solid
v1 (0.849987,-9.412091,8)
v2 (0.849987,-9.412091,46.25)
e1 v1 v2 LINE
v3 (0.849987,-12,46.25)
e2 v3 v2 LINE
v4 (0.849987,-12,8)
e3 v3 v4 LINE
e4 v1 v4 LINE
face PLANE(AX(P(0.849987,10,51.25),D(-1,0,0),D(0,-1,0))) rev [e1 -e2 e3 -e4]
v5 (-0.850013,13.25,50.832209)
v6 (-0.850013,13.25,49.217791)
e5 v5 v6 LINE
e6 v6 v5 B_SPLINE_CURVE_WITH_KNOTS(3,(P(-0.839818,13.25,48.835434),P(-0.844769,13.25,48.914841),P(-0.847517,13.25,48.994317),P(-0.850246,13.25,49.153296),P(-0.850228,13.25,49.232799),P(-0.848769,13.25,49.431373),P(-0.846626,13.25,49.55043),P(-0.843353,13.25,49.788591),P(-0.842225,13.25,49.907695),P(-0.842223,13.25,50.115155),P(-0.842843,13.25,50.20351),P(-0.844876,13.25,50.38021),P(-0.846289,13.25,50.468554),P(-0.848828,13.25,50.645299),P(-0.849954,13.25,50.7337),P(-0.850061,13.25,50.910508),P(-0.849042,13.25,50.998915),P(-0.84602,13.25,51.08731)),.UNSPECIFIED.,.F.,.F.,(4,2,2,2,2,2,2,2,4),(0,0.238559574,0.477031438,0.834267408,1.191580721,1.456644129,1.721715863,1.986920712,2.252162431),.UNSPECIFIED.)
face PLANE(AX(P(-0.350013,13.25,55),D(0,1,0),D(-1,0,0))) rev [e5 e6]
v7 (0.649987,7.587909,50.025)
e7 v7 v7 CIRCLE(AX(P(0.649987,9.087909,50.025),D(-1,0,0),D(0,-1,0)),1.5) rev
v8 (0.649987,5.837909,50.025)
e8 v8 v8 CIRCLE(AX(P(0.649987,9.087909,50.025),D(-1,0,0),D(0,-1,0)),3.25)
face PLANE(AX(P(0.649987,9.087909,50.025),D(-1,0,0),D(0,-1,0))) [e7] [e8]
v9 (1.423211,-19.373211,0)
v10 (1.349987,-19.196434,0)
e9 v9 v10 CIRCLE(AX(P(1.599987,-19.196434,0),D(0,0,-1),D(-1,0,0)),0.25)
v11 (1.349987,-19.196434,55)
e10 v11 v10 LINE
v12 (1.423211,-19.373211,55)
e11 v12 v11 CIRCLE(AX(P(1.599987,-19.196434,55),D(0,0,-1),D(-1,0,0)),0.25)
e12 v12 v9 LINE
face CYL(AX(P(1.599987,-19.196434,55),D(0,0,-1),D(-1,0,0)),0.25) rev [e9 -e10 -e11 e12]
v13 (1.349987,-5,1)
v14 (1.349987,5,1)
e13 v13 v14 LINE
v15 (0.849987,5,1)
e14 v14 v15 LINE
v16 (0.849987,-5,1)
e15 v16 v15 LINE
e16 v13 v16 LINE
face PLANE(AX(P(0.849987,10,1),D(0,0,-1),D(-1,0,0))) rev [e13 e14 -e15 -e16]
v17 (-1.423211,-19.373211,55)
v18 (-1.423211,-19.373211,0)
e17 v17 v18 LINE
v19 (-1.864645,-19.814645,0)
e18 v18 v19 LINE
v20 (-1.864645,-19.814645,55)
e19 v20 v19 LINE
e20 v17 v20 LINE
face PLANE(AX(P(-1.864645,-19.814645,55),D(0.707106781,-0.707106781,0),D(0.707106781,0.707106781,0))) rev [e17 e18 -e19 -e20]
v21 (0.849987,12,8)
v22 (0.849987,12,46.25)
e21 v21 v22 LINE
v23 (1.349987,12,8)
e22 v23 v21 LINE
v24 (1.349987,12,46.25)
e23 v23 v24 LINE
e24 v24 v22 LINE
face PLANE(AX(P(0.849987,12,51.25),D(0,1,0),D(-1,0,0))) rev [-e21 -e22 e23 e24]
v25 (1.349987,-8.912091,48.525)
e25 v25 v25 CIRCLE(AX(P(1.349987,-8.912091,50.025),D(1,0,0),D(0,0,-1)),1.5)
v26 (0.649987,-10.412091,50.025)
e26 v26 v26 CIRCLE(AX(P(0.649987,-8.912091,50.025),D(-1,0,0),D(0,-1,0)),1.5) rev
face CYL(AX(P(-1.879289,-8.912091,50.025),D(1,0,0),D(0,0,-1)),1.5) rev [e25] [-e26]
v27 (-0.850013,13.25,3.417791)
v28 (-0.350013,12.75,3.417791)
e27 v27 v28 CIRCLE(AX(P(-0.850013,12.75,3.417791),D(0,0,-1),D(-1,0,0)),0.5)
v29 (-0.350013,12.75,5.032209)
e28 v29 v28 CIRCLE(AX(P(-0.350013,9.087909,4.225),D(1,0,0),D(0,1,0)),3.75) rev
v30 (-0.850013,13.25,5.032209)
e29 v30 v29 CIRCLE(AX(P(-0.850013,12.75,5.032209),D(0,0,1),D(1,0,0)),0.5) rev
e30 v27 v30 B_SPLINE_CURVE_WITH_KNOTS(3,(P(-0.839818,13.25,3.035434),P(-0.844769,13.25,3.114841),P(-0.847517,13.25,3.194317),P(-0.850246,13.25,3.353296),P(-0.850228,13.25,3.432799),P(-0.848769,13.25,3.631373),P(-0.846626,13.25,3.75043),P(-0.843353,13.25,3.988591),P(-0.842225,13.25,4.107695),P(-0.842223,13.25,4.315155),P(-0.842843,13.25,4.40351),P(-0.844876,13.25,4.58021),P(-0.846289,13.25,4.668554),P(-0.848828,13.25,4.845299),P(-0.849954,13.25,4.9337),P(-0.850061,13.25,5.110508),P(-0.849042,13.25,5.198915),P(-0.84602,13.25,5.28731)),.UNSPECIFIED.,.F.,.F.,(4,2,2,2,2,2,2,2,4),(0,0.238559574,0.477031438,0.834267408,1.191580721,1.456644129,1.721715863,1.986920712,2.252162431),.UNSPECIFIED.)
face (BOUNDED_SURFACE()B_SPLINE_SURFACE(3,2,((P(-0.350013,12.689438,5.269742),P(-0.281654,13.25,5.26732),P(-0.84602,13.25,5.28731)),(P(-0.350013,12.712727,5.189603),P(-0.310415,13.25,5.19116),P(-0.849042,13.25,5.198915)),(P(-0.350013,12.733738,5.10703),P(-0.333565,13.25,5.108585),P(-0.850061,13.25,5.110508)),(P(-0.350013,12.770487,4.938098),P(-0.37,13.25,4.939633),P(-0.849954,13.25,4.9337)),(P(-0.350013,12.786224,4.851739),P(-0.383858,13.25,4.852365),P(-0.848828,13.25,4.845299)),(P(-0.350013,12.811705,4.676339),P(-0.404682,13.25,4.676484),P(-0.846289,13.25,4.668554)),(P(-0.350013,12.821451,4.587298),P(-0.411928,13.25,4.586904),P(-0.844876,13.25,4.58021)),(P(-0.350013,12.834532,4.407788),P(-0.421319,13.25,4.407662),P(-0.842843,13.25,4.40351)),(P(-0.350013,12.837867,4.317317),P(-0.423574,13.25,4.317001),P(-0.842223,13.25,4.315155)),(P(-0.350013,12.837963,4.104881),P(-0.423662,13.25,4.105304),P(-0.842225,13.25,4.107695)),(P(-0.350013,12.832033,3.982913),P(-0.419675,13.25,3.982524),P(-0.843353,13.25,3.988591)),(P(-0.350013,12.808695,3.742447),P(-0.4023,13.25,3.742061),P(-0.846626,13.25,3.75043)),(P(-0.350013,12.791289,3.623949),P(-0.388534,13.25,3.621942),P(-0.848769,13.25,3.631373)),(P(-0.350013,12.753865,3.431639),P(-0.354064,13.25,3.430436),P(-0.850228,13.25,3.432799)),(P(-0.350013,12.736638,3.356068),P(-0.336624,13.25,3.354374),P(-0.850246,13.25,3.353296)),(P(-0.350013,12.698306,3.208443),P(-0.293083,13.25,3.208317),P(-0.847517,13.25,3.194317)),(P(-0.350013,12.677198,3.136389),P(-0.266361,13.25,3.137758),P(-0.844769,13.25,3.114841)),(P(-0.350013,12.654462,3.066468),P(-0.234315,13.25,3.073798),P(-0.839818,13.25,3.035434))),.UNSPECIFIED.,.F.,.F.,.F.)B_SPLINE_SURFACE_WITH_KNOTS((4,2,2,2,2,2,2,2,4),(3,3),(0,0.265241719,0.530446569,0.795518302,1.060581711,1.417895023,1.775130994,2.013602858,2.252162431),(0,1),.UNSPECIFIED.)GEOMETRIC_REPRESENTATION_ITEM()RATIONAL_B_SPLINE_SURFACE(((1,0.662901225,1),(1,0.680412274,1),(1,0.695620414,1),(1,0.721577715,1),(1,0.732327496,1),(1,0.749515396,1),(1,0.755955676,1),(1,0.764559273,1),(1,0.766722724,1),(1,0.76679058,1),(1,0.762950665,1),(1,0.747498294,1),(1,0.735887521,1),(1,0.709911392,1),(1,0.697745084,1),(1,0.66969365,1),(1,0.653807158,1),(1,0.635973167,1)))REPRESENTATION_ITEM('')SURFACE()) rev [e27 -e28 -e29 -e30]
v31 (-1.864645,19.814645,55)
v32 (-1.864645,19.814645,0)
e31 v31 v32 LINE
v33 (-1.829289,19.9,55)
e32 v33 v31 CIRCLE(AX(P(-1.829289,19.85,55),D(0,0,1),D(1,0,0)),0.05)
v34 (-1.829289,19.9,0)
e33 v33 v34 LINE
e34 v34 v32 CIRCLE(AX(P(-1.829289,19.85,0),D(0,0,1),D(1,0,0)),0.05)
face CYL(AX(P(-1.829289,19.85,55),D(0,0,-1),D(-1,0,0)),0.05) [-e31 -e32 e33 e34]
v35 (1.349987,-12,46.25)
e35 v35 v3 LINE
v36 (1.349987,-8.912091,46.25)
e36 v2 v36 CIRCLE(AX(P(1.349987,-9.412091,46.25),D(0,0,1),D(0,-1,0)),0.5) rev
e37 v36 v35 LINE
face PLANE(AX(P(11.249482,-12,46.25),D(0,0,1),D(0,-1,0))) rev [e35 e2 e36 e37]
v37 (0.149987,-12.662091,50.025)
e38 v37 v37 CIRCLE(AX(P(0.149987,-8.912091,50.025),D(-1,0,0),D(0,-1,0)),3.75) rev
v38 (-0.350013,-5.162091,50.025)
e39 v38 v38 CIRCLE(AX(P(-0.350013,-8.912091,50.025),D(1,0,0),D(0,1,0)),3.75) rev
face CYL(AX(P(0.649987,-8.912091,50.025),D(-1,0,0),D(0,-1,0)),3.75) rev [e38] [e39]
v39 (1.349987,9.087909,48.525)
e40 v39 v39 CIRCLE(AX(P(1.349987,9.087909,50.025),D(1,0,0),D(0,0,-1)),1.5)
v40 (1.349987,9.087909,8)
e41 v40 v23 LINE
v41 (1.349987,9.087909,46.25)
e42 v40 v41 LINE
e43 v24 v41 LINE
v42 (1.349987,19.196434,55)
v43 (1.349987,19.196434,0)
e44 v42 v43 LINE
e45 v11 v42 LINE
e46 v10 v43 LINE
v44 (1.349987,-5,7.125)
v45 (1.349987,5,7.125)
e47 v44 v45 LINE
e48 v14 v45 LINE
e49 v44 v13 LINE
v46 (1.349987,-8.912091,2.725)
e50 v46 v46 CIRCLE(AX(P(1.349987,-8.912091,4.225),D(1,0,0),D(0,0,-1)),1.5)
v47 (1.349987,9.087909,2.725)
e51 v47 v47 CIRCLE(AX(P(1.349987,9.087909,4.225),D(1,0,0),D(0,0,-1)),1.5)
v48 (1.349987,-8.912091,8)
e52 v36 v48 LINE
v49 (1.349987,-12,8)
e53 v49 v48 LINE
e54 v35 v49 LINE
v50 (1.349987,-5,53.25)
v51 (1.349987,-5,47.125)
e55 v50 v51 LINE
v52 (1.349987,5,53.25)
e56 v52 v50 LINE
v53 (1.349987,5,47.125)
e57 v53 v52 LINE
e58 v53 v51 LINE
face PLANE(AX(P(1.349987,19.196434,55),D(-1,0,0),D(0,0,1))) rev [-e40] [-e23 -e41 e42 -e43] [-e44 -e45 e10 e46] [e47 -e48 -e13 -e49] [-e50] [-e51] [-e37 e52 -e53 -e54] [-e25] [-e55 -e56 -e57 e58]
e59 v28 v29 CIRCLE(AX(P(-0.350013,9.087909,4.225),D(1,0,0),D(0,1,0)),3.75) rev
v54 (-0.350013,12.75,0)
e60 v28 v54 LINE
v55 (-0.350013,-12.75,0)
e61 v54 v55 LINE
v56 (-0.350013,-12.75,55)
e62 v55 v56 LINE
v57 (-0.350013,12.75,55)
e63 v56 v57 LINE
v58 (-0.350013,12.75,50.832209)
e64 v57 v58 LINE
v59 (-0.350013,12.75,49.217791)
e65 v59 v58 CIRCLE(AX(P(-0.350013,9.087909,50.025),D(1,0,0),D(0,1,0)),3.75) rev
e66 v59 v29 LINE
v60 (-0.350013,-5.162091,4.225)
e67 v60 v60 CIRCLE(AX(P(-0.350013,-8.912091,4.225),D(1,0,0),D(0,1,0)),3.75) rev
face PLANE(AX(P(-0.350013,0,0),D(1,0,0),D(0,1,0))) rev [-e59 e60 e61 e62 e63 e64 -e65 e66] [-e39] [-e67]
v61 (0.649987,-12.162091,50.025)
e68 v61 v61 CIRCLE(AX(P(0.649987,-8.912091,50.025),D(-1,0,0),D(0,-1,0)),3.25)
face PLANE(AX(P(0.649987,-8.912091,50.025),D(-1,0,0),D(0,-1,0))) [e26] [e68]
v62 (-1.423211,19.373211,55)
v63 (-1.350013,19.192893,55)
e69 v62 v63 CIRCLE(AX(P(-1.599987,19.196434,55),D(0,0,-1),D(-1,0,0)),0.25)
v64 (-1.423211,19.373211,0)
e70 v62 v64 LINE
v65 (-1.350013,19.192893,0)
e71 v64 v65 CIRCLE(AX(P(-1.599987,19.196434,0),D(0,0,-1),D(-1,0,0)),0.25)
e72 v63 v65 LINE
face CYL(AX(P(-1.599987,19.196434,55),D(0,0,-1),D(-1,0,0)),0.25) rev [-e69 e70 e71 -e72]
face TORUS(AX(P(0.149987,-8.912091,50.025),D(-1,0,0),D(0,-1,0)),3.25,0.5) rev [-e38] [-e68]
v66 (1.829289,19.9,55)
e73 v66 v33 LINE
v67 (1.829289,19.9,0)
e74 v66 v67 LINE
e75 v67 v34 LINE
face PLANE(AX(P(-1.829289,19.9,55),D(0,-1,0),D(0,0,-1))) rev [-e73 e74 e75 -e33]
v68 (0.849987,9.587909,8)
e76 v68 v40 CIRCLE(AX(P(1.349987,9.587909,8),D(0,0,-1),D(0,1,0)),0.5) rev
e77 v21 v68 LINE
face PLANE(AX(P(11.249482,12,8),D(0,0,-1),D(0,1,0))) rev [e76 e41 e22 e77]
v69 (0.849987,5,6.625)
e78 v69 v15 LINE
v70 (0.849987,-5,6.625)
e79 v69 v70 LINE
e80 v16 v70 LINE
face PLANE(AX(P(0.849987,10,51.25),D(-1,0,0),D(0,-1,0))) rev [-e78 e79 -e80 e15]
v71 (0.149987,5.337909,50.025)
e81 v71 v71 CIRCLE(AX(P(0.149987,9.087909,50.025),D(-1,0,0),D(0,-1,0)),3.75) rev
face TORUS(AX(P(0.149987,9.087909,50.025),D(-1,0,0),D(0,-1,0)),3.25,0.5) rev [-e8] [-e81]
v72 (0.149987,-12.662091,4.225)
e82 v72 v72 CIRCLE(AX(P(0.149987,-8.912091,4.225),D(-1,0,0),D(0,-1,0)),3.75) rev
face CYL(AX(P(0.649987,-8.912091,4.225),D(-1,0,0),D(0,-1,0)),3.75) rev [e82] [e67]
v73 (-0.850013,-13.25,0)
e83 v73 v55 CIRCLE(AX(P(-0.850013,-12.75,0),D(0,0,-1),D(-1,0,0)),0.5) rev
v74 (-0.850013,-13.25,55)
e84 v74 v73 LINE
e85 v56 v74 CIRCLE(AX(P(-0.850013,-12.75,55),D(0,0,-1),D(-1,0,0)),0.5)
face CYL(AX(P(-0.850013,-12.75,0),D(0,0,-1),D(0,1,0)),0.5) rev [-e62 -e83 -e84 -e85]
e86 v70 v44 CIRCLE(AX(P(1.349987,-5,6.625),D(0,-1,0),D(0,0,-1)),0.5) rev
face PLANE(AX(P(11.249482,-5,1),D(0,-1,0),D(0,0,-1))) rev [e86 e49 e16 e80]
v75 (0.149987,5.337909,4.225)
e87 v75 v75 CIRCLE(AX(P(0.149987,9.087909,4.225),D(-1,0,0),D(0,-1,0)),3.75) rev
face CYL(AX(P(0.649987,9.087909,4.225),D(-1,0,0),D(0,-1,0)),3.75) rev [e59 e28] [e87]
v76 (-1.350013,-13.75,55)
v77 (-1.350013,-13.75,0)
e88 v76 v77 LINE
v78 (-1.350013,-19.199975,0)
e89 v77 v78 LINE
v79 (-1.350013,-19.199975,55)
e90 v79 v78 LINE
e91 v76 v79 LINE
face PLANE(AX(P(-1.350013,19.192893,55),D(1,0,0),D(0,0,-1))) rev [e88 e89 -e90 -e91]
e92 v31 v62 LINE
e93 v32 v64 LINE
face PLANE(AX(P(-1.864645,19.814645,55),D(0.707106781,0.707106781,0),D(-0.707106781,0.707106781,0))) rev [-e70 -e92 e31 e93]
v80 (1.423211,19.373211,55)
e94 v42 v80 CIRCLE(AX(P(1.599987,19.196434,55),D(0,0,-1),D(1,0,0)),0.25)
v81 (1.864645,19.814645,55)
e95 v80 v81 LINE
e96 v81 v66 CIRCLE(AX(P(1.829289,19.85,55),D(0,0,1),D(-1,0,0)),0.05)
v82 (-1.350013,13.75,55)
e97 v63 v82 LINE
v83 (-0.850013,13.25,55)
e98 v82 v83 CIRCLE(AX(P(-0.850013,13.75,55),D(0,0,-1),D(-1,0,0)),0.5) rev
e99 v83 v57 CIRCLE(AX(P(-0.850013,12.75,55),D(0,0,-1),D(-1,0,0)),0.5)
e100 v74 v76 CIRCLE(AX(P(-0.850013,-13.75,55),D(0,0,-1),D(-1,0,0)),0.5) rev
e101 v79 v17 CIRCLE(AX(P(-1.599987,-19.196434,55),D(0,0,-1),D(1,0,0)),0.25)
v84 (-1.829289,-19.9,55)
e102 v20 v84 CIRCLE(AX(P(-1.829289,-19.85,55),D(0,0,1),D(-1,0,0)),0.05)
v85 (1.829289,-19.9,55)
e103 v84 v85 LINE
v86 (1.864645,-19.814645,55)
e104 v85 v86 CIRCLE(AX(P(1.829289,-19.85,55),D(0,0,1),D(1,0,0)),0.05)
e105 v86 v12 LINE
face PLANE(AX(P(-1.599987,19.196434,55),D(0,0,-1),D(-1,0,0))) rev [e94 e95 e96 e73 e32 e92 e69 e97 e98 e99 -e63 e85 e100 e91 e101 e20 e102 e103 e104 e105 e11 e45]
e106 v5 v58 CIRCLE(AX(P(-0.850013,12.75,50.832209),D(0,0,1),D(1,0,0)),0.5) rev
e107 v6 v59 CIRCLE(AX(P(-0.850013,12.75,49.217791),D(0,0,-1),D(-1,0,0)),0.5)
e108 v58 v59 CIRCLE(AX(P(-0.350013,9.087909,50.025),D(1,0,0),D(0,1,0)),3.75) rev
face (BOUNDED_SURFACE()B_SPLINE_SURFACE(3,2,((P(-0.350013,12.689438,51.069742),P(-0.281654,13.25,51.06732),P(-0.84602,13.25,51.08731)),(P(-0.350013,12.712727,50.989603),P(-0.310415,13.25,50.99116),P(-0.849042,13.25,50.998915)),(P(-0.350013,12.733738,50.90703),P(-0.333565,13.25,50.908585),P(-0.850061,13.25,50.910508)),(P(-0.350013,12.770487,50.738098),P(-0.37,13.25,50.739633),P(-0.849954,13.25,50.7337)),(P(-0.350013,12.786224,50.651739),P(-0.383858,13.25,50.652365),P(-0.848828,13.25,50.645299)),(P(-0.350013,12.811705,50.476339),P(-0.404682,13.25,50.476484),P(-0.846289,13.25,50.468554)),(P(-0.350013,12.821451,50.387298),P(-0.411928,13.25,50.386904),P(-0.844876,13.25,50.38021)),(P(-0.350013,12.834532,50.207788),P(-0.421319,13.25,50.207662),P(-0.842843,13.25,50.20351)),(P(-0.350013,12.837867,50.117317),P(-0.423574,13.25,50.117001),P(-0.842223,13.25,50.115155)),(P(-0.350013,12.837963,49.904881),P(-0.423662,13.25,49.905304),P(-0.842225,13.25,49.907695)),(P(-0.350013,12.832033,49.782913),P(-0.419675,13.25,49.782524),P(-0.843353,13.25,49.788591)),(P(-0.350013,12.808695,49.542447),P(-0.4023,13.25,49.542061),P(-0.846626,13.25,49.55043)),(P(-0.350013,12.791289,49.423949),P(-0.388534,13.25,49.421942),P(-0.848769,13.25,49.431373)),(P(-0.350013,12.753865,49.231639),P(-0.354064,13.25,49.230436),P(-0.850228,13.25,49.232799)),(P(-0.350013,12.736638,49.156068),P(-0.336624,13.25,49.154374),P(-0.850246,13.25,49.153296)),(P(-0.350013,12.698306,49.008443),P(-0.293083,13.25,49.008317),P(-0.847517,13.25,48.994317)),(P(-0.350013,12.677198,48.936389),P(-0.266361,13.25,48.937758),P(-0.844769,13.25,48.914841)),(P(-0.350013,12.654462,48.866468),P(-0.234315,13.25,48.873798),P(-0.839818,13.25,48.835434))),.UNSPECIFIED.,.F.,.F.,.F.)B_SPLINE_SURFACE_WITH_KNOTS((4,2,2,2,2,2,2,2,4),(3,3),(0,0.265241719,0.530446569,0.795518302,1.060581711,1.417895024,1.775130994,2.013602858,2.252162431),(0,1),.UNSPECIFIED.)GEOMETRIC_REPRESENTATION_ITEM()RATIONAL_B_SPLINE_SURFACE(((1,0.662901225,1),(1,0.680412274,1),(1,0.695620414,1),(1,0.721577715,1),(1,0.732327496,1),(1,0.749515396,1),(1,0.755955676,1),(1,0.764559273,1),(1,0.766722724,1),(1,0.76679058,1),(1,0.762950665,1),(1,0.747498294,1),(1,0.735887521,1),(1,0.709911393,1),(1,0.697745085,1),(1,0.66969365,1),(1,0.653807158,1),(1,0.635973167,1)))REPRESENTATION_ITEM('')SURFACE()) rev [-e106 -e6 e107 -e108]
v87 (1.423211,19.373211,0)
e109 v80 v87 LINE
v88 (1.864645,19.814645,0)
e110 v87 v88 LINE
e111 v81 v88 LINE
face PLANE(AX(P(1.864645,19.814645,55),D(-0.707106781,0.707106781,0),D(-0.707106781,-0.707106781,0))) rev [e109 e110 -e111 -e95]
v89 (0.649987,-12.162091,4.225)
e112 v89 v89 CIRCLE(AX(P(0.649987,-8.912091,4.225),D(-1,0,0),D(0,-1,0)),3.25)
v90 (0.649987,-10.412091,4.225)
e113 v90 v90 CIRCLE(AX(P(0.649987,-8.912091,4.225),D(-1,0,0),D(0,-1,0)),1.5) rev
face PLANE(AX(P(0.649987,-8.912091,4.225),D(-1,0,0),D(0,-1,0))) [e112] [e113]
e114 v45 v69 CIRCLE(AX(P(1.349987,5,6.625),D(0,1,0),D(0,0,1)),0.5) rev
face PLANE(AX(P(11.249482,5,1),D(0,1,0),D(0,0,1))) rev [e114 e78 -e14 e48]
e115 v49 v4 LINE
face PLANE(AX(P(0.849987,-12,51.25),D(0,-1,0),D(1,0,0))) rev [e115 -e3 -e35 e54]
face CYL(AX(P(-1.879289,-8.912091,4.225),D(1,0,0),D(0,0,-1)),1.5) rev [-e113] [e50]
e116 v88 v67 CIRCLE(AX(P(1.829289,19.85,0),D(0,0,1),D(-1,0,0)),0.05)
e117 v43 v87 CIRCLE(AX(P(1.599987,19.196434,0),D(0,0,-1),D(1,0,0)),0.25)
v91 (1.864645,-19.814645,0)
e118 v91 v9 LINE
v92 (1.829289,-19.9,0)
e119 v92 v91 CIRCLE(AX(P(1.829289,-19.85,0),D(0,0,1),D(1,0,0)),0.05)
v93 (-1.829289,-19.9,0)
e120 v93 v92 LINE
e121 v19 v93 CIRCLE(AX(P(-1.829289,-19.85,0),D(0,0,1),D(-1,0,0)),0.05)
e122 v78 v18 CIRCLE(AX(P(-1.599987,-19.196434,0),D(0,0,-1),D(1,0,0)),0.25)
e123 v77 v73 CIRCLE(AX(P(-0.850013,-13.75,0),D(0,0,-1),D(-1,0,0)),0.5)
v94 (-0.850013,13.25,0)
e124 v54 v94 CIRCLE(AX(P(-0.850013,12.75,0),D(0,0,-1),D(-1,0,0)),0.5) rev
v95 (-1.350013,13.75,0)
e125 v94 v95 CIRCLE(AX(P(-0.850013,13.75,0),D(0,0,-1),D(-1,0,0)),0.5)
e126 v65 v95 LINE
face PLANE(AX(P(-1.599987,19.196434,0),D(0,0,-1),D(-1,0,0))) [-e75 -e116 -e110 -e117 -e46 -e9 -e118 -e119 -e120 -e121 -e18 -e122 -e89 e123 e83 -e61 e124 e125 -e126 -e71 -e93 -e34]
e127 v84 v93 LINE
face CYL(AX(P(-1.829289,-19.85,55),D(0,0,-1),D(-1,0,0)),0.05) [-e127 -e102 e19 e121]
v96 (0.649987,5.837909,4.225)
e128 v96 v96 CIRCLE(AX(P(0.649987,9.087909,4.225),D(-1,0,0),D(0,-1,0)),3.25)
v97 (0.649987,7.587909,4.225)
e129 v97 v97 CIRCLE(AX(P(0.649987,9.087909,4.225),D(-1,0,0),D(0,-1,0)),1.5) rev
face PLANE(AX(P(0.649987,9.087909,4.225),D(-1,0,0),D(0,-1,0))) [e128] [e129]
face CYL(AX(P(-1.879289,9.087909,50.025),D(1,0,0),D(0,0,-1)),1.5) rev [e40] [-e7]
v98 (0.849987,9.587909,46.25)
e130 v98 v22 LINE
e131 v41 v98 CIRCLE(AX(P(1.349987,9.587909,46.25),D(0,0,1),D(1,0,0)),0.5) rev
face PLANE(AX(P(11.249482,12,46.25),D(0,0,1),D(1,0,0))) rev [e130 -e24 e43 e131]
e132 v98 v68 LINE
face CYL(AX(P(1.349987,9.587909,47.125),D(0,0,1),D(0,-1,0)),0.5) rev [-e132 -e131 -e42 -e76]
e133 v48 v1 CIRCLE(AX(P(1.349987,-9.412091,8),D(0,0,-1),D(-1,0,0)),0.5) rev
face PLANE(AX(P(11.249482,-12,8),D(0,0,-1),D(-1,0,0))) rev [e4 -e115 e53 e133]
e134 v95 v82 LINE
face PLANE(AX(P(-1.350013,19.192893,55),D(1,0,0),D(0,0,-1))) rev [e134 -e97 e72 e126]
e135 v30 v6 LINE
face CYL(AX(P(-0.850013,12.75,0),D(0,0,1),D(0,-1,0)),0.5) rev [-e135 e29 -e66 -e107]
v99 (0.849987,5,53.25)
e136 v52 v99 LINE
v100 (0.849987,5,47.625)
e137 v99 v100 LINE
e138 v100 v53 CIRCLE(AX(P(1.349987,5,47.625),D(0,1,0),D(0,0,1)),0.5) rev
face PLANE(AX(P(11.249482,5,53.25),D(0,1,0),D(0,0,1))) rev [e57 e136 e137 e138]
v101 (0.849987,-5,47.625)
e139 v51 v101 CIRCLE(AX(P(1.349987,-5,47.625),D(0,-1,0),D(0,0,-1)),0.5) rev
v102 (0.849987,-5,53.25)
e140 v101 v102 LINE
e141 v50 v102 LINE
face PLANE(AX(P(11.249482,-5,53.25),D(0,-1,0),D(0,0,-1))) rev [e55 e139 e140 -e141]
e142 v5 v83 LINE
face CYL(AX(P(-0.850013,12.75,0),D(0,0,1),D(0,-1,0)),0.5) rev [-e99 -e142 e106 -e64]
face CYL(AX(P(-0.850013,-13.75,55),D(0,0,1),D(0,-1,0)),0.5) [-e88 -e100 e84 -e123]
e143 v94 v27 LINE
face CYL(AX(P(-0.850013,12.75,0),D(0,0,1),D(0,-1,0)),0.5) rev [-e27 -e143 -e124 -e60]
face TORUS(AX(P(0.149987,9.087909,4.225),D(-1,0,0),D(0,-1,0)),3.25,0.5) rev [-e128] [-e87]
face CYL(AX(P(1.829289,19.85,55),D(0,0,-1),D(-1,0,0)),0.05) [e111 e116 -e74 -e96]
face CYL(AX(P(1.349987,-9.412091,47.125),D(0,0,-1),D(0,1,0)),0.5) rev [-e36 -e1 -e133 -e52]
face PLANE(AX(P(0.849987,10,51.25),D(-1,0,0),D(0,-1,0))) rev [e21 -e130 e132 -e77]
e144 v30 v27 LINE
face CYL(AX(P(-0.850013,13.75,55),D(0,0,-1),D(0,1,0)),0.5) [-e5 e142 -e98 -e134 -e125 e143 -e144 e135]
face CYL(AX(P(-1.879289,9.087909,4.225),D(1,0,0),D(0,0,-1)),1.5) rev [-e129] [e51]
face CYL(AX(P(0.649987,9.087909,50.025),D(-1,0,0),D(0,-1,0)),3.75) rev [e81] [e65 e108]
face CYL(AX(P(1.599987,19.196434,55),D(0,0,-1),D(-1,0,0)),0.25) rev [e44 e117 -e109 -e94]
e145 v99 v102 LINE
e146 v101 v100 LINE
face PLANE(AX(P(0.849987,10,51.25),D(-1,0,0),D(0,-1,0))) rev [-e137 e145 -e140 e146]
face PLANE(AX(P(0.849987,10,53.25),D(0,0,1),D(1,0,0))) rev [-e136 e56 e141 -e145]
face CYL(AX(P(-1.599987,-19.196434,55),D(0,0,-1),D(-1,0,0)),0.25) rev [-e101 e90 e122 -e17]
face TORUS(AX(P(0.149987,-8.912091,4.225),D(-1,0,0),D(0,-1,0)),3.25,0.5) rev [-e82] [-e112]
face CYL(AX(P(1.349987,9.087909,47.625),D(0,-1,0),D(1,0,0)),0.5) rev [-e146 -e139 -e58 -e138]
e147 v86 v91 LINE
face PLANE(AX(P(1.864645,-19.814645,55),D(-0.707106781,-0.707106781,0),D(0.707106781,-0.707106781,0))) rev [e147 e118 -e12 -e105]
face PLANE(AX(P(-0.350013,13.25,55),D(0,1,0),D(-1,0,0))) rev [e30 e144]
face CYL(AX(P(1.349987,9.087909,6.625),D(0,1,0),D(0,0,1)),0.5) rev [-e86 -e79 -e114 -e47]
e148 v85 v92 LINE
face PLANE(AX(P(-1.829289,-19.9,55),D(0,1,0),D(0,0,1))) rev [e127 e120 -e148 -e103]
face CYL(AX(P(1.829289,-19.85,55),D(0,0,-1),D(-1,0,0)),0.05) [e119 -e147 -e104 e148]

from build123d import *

# Parameters (mm, degrees)
BOSS_EXTRUDE1_DEPTH = 55
SKETCH2_R           = 2.5
SKETCH2_W           = 40
SKETCH2_H           = 18
CUT_EXTRUDE4_DEPTH  = 0.5
SKETCH7_R           = 1.5
CUT_EXTRUDE7_DEPTH  = 59.578479227
SKETCH8_R           = 3.75
CUT_EXTRUDE8_DEPTH  = 2
SKETCH9_W           = 55
SKETCH9_H           = 26.5
CUT_EXTRUDE9_DEPTH  = 1
FILLET1_R           = 0.5
FILLET2_R           = 0.5
FILLET4_R           = 0.5
FILLET5_R           = 0.5
BOSS_EXTRUDE3_START = 0.5
SKETCH10_W          = 7
SKETCH10_H          = 7
SKETCH10_R          = 1.5
BOSS_EXTRUDE3_DEPTH = 0.5


# Some blends are built 0.0001 mm under size
with BuildPart() as part:
    # Sketch1 → Boss-Extrude1 (new body)
    with BuildSketch(Plane.XY):
        with BuildLine():
            Line((-1.829289322, 19.9), (1.829289322, 19.9))
            ThreePointArc((1.829289322, 19.9), (1.875483299, 19.869134172), (1.864644661, 19.814644661))
            Line((1.864644661, 19.814644661), (1.423210766, 19.373210766))
            ThreePointArc((1.423210766, 19.373210766), (1.369017579, 19.292104929), (1.349987462, 19.196434071))
            Line((1.349987462, 19.196434071), (1.349987462, -19.196434071))
            ThreePointArc((1.349987462, -19.196434071), (1.369017579, -19.292104929), (1.423210766, -19.373210766))
            Line((1.423210766, -19.373210766), (1.864644661, -19.814644661))
            ThreePointArc((1.864644661, -19.814644661), (1.875483299, -19.869134172), (1.829289322, -19.9))
            Line((1.829289322, -19.9), (-1.829289322, -19.9))
            ThreePointArc((-1.829289322, -19.9), (-1.875483299, -19.869134172), (-1.864644661, -19.814644661))
            Line((-1.864644661, -19.814644661), (-1.423210766, -19.373210766))
            ThreePointArc((-1.423210766, -19.373210766), (-1.3697009, -19.293738232), (-1.350012538, -19.199974923))
            Line((-1.350012538, -19.199974923), (-1.350012538, 19.192893219))
            ThreePointArc((-1.350012538, 19.192893219), (-1.368345841, 19.290466829), (-1.423210766, 19.373210766))
            Line((-1.423210766, 19.373210766), (-1.864644661, 19.814644661))
            ThreePointArc((-1.864644661, 19.814644661), (-1.875483299, 19.869134172), (-1.829289322, 19.9))
        make_face()
    extrude(amount=BOSS_EXTRUDE1_DEPTH)

    # Sketch2 → Cut-Extrude4 (cut)
    with BuildSketch(Plane(origin=(1.349987462, 0, 0), x_dir=(0, 0, -1), z_dir=(1, 0, 0))):
        with BuildLine():
            Line((-51.25, 12), (-3, 12))
            ThreePointArc((-3, 12), (-1.585786438, 11.414213562), (-1, 10))
            Line((-1, 10), (-1, -10))
            ThreePointArc((-1, -10), (-1.585786438, -11.414213562), (-3, -12))
            Line((-3, -12), (-51.25, -12))
            ThreePointArc((-51.25, -12), (-52.664213562, -11.414213562), (-53.25, -10))
            Line((-53.25, -10), (-53.25, 10))
            ThreePointArc((-53.25, 10), (-52.664213562, 11.414213562), (-51.25, 12))
        make_face()
        with Locations(Location((-50.025, 9.087908505, 0), (0, 0, 90))):
            Circle(SKETCH2_R, mode=Mode.SUBTRACT)
        with Locations(Location((-50.025, -8.912091495, 0), (0, 0, 90))):
            Circle(SKETCH2_R, mode=Mode.SUBTRACT)
        with Locations(Location((-4.225, -8.912091495, 0), (0, 0, 90))):
            Circle(SKETCH2_R, mode=Mode.SUBTRACT)
        with Locations(Location((-4.225, 9.087908505, 0), (0, 0, 90))):
            Circle(SKETCH2_R, mode=Mode.SUBTRACT)
        with Locations((-27.125, 0.087908505)):
            Rectangle(SKETCH2_W, SKETCH2_H, mode=Mode.SUBTRACT)
    extrude(amount=-CUT_EXTRUDE4_DEPTH, mode=Mode.SUBTRACT)

    # Sketch7 → Cut-Extrude7 (cut, through all)
    with BuildSketch(Plane(origin=(1.349987462, 0, 0), x_dir=(0, 0, -1), z_dir=(1, 0, 0))):
        with Locations((-50.025, 9.087908505)):
            Circle(SKETCH7_R)
        with Locations((-4.225, 9.087908505)):
            Circle(SKETCH7_R)
        with Locations((-4.225, -8.912091495)):
            Circle(SKETCH7_R)
        with Locations((-50.025, -8.912091495)):
            Circle(SKETCH7_R)
    extrude(amount=-CUT_EXTRUDE7_DEPTH, mode=Mode.SUBTRACT)

    # Sketch8 → Cut-Extrude8 (cut)
    with BuildSketch(Plane.ZY.offset(1.350012538)):
        with Locations(Location((4.225, 9.087908505, 0), (0, 0, 270))):
            Circle(SKETCH8_R)
        with Locations(Location((4.225, -8.912091495, 0), (0, 0, 270))):
            Circle(SKETCH8_R)
        with Locations(Location((50.025, 9.087908505, 0), (0, 0, 270))):
            Circle(SKETCH8_R)
        with Locations(Location((50.025, -8.912091495, 0), (0, 0, 270))):
            Circle(SKETCH8_R)
    extrude(amount=-CUT_EXTRUDE8_DEPTH, mode=Mode.SUBTRACT)

    # Sketch9 → Cut-Extrude9 (cut)
    with BuildSketch(Plane.ZY.offset(1.350012538)):
        with Locations((27.5, 0)):
            Rectangle(SKETCH9_W, SKETCH9_H)
    extrude(amount=-CUT_EXTRUDE9_DEPTH, mode=Mode.SUBTRACT)

    # Fillet1
    fillet1_edges = [part.edges().sort_by_distance(p)[0] for p in [
        (-0.350012538, 13.25, 27.5),
        (-0.350012538, -13.25, 27.5),
    ]]
    fillet(fillet1_edges, radius=FILLET1_R)

    # Fillet2
    fillet2_edges = [part.edges().sort_by_distance(p)[0] for p in [
        (-1.350012538, -13.25, 27.5),
        (-1.350012538, 13.25, 27.5),
    ]]
    fillet(fillet2_edges, radius=FILLET2_R - 0.0001)  # a hair under: the kernel refuses the full size

    # Fillet4
    # the kernel refuses this fillet: 0.5 mm, written as the material it adds along each edge
    with BuildSketch(Plane(origin=(0.849987462, 9.087908505, 7.125), x_dir=(0, 0, -1), z_dir=(0, -1, 0)), Plane(origin=(0.849987462, -8.912091495, 47.125), x_dir=(0, 0, 1), z_dir=(0, 1, 0))) as fillet4_piece_1:
        with BuildLine():
            CenterArc((FILLET4_R, FILLET4_R), FILLET4_R, 180, 90)
            Line((0, FILLET4_R), (-FILLET4_R * 0.02, FILLET4_R))
            Line((-FILLET4_R * 0.02, FILLET4_R), (-FILLET4_R * 0.02, -FILLET4_R * 0.02))
            Line((-FILLET4_R * 0.02, -FILLET4_R * 0.02), (FILLET4_R, -FILLET4_R * 0.02))
            Line((FILLET4_R, -FILLET4_R * 0.02), (FILLET4_R, 0))
        make_face()
    extrude(amount=18)
    with BuildSketch(Plane(origin=(0.849987462, -8.912091495, 7.125), x_dir=(0, -1, 0), z_dir=(0, 0, 1)), Plane(origin=(0.849987462, 9.087908505, 47.125), x_dir=(0, 1, 0), z_dir=(0, 0, -1))) as fillet4_piece_2:
        with BuildLine():
            CenterArc((FILLET4_R, FILLET4_R), FILLET4_R, 180, 90)
            Line((0, FILLET4_R), (-FILLET4_R * 0.02, FILLET4_R))
            Line((-FILLET4_R * 0.02, FILLET4_R), (-FILLET4_R * 0.02, -FILLET4_R * 0.02))
            Line((-FILLET4_R * 0.02, -FILLET4_R * 0.02), (FILLET4_R, -FILLET4_R * 0.02))
            Line((FILLET4_R, -FILLET4_R * 0.02), (FILLET4_R, 0))
        make_face()
    extrude(amount=40)
    with BuildSketch(Plane(origin=(0.849987462, 10.337908505, 7.125), x_dir=(0, 0, -1), z_dir=(0, -1, 0))) as fillet4_piece_3a_section:
        with BuildLine():
            CenterArc((FILLET4_R, FILLET4_R), FILLET4_R, 180, 90)
            Line((0, FILLET4_R), (-FILLET4_R * 0.02, FILLET4_R))
            Line((-FILLET4_R * 0.02, FILLET4_R), (-FILLET4_R * 0.02, -FILLET4_R * 0.02))
            Line((-FILLET4_R * 0.02, -FILLET4_R * 0.02), (FILLET4_R, -FILLET4_R * 0.02))
            Line((FILLET4_R, -FILLET4_R * 0.02), (FILLET4_R, 0))
        make_face()
    fillet4_piece_3a = extrude(amount=19.25, mode=Mode.PRIVATE)
    fillet4_piece_3a = split(fillet4_piece_3a, bisect_by=Plane(origin=(0.963185019, 9.087908505, 7.011802443), z_dir=(0, 1, 0)), keep=Keep.TOP, mode=Mode.PRIVATE)
    with BuildSketch(Plane(origin=(0.849987462, 9.087908505, 47.125), x_dir=(0, 1, 0), z_dir=(0, 0, -1))) as fillet4_piece_3b_section:
        with BuildLine():
            CenterArc((FILLET4_R, FILLET4_R), FILLET4_R, 180, 90)
            Line((0, FILLET4_R), (-FILLET4_R * 0.02, FILLET4_R))
            Line((-FILLET4_R * 0.02, FILLET4_R), (-FILLET4_R * 0.02, -FILLET4_R * 0.02))
            Line((-FILLET4_R * 0.02, -FILLET4_R * 0.02), (FILLET4_R, -FILLET4_R * 0.02))
            Line((FILLET4_R, -FILLET4_R * 0.02), (FILLET4_R, 0))
        make_face()
    fillet4_piece_3b = extrude(amount=41.25, mode=Mode.PRIVATE)
    fillet4_piece_3b = split(fillet4_piece_3b, bisect_by=Plane(origin=(0.963185019, 9.201106062, 7.125), z_dir=(0, 0, -1)), keep=Keep.TOP, mode=Mode.PRIVATE)
    fillet4_piece_3 = fillet4_piece_3a & fillet4_piece_3b
    add(fillet4_piece_3)
    with BuildSketch(Plane(origin=(0.849987462, -8.912091495, 5.875), x_dir=(0, -1, 0), z_dir=(0, 0, 1))) as fillet4_piece_4a_section:
        with BuildLine():
            CenterArc((FILLET4_R, FILLET4_R), FILLET4_R, 180, 90)
            Line((0, FILLET4_R), (-FILLET4_R * 0.02, FILLET4_R))
            Line((-FILLET4_R * 0.02, FILLET4_R), (-FILLET4_R * 0.02, -FILLET4_R * 0.02))
            Line((-FILLET4_R * 0.02, -FILLET4_R * 0.02), (FILLET4_R, -FILLET4_R * 0.02))
            Line((FILLET4_R, -FILLET4_R * 0.02), (FILLET4_R, 0))
        make_face()
    fillet4_piece_4a = extrude(amount=41.25, mode=Mode.PRIVATE)
    fillet4_piece_4a = split(fillet4_piece_4a, bisect_by=Plane(origin=(0.963185019, -9.025289052, 7.125), z_dir=(0, 0, -1)), keep=Keep.TOP, mode=Mode.PRIVATE)
    with BuildSketch(Plane(origin=(0.849987462, 9.087908505, 7.125), x_dir=(0, 0, -1), z_dir=(0, -1, 0))) as fillet4_piece_4b_section:
        with BuildLine():
            CenterArc((FILLET4_R, FILLET4_R), FILLET4_R, 180, 90)
            Line((0, FILLET4_R), (-FILLET4_R * 0.02, FILLET4_R))
            Line((-FILLET4_R * 0.02, FILLET4_R), (-FILLET4_R * 0.02, -FILLET4_R * 0.02))
            Line((-FILLET4_R * 0.02, -FILLET4_R * 0.02), (FILLET4_R, -FILLET4_R * 0.02))
            Line((FILLET4_R, -FILLET4_R * 0.02), (FILLET4_R, 0))
        make_face()
    fillet4_piece_4b = extrude(amount=19.25, mode=Mode.PRIVATE)
    fillet4_piece_4b = split(fillet4_piece_4b, bisect_by=Plane(origin=(0.963185019, -8.912091495, 7.011802443), z_dir=(0, -1, 0)), keep=Keep.TOP, mode=Mode.PRIVATE)
    fillet4_piece_4 = fillet4_piece_4a & fillet4_piece_4b
    add(fillet4_piece_4)
    with BuildSketch(Plane(origin=(0.849987462, -10.162091495, 47.125), x_dir=(0, 0, 1), z_dir=(0, 1, 0))) as fillet4_piece_5a_section:
        with BuildLine():
            CenterArc((FILLET4_R, FILLET4_R), FILLET4_R, 180, 90)
            Line((0, FILLET4_R), (-FILLET4_R * 0.02, FILLET4_R))
            Line((-FILLET4_R * 0.02, FILLET4_R), (-FILLET4_R * 0.02, -FILLET4_R * 0.02))
            Line((-FILLET4_R * 0.02, -FILLET4_R * 0.02), (FILLET4_R, -FILLET4_R * 0.02))
            Line((FILLET4_R, -FILLET4_R * 0.02), (FILLET4_R, 0))
        make_face()
    fillet4_piece_5a = extrude(amount=19.25, mode=Mode.PRIVATE)
    fillet4_piece_5a = split(fillet4_piece_5a, bisect_by=Plane(origin=(0.963185019, -8.912091495, 47.238197557), z_dir=(0, -1, 0)), keep=Keep.TOP, mode=Mode.PRIVATE)
    with BuildSketch(Plane(origin=(0.849987462, -8.912091495, 7.125), x_dir=(0, -1, 0), z_dir=(0, 0, 1))) as fillet4_piece_5b_section:
        with BuildLine():
            CenterArc((FILLET4_R, FILLET4_R), FILLET4_R, 180, 90)
            Line((0, FILLET4_R), (-FILLET4_R * 0.02, FILLET4_R))
            Line((-FILLET4_R * 0.02, FILLET4_R), (-FILLET4_R * 0.02, -FILLET4_R * 0.02))
            Line((-FILLET4_R * 0.02, -FILLET4_R * 0.02), (FILLET4_R, -FILLET4_R * 0.02))
            Line((FILLET4_R, -FILLET4_R * 0.02), (FILLET4_R, 0))
        make_face()
    fillet4_piece_5b = extrude(amount=41.25, mode=Mode.PRIVATE)
    fillet4_piece_5b = split(fillet4_piece_5b, bisect_by=Plane(origin=(0.963185019, -9.025289052, 47.125), z_dir=(0, 0, 1)), keep=Keep.TOP, mode=Mode.PRIVATE)
    fillet4_piece_5 = fillet4_piece_5a & fillet4_piece_5b
    add(fillet4_piece_5)
    with BuildSketch(Plane(origin=(0.849987462, -8.912091495, 47.125), x_dir=(0, 0, 1), z_dir=(0, 1, 0))) as fillet4_piece_6a_section:
        with BuildLine():
            CenterArc((FILLET4_R, FILLET4_R), FILLET4_R, 180, 90)
            Line((0, FILLET4_R), (-FILLET4_R * 0.02, FILLET4_R))
            Line((-FILLET4_R * 0.02, FILLET4_R), (-FILLET4_R * 0.02, -FILLET4_R * 0.02))
            Line((-FILLET4_R * 0.02, -FILLET4_R * 0.02), (FILLET4_R, -FILLET4_R * 0.02))
            Line((FILLET4_R, -FILLET4_R * 0.02), (FILLET4_R, 0))
        make_face()
    fillet4_piece_6a = extrude(amount=19.25, mode=Mode.PRIVATE)
    fillet4_piece_6a = split(fillet4_piece_6a, bisect_by=Plane(origin=(0.963185019, 9.087908505, 47.238197557), z_dir=(0, 1, 0)), keep=Keep.TOP, mode=Mode.PRIVATE)
    with BuildSketch(Plane(origin=(0.849987462, 9.087908505, 48.375), x_dir=(0, 1, 0), z_dir=(0, 0, -1))) as fillet4_piece_6b_section:
        with BuildLine():
            CenterArc((FILLET4_R, FILLET4_R), FILLET4_R, 180, 90)
            Line((0, FILLET4_R), (-FILLET4_R * 0.02, FILLET4_R))
            Line((-FILLET4_R * 0.02, FILLET4_R), (-FILLET4_R * 0.02, -FILLET4_R * 0.02))
            Line((-FILLET4_R * 0.02, -FILLET4_R * 0.02), (FILLET4_R, -FILLET4_R * 0.02))
            Line((FILLET4_R, -FILLET4_R * 0.02), (FILLET4_R, 0))
        make_face()
    fillet4_piece_6b = extrude(amount=41.25, mode=Mode.PRIVATE)
    fillet4_piece_6b = split(fillet4_piece_6b, bisect_by=Plane(origin=(0.963185019, 9.201106062, 47.125), z_dir=(0, 0, 1)), keep=Keep.TOP, mode=Mode.PRIVATE)
    fillet4_piece_6 = fillet4_piece_6a & fillet4_piece_6b
    add(fillet4_piece_6)

    # Fillet5
    fillet5_edges = [part.edges().sort_by_distance(p)[0] for p in [
        (0.649987462, -5.162091495, 4.225),
        (0.649987462, 12.837908505, 50.025),
        (0.649987462, -5.162091495, 50.025),
        (0.649987462, 12.837908505, 4.225),
    ]]
    fillet(fillet5_edges, radius=FILLET5_R)

    # Sketch10 → Boss-Extrude3 (add)
    # profile 1 of 4: a face of its own
    with BuildSketch(Plane(origin=(0.849987462, 0, 0), x_dir=(0, 0, -1), z_dir=(1, 0, 0)).offset(BOSS_EXTRUDE3_START)):
        with Locations((-4.5, 8.5)):
            Rectangle(SKETCH10_W, SKETCH10_H)
        with Locations((-4.225, 9.087908505)):
            Circle(SKETCH10_R, mode=Mode.SUBTRACT)
    # profile 2 of 4: a face of its own
    with BuildSketch(Plane(origin=(0.849987462, 0, 0), x_dir=(0, 0, -1), z_dir=(1, 0, 0)).offset(BOSS_EXTRUDE3_START)):
        with Locations((-49.75, -8.5)):
            Rectangle(SKETCH10_W, SKETCH10_H)
        with Locations((-50.025, -8.912091495)):
            Circle(SKETCH10_R, mode=Mode.SUBTRACT)
    # profile 3 of 4: a face of its own
    with BuildSketch(Plane(origin=(0.849987462, 0, 0), x_dir=(0, 0, -1), z_dir=(1, 0, 0)).offset(BOSS_EXTRUDE3_START)):
        with Locations((-4.5, -8.5)):
            Rectangle(SKETCH10_W, SKETCH10_H)
        with Locations((-4.225, -8.912091495)):
            Circle(SKETCH10_R, mode=Mode.SUBTRACT)
    # profile 4 of 4: a face of its own
    with BuildSketch(Plane(origin=(0.849987462, 0, 0), x_dir=(0, 0, -1), z_dir=(1, 0, 0)).offset(BOSS_EXTRUDE3_START)):
        with Locations((-49.75, 8.5)):
            Rectangle(SKETCH10_W, SKETCH10_H)
        with Locations((-50.025, 9.087908505)):
            Circle(SKETCH10_R, mode=Mode.SUBTRACT)
    extrude(amount=-BOSS_EXTRUDE3_DEPTH)


solid = part.part
